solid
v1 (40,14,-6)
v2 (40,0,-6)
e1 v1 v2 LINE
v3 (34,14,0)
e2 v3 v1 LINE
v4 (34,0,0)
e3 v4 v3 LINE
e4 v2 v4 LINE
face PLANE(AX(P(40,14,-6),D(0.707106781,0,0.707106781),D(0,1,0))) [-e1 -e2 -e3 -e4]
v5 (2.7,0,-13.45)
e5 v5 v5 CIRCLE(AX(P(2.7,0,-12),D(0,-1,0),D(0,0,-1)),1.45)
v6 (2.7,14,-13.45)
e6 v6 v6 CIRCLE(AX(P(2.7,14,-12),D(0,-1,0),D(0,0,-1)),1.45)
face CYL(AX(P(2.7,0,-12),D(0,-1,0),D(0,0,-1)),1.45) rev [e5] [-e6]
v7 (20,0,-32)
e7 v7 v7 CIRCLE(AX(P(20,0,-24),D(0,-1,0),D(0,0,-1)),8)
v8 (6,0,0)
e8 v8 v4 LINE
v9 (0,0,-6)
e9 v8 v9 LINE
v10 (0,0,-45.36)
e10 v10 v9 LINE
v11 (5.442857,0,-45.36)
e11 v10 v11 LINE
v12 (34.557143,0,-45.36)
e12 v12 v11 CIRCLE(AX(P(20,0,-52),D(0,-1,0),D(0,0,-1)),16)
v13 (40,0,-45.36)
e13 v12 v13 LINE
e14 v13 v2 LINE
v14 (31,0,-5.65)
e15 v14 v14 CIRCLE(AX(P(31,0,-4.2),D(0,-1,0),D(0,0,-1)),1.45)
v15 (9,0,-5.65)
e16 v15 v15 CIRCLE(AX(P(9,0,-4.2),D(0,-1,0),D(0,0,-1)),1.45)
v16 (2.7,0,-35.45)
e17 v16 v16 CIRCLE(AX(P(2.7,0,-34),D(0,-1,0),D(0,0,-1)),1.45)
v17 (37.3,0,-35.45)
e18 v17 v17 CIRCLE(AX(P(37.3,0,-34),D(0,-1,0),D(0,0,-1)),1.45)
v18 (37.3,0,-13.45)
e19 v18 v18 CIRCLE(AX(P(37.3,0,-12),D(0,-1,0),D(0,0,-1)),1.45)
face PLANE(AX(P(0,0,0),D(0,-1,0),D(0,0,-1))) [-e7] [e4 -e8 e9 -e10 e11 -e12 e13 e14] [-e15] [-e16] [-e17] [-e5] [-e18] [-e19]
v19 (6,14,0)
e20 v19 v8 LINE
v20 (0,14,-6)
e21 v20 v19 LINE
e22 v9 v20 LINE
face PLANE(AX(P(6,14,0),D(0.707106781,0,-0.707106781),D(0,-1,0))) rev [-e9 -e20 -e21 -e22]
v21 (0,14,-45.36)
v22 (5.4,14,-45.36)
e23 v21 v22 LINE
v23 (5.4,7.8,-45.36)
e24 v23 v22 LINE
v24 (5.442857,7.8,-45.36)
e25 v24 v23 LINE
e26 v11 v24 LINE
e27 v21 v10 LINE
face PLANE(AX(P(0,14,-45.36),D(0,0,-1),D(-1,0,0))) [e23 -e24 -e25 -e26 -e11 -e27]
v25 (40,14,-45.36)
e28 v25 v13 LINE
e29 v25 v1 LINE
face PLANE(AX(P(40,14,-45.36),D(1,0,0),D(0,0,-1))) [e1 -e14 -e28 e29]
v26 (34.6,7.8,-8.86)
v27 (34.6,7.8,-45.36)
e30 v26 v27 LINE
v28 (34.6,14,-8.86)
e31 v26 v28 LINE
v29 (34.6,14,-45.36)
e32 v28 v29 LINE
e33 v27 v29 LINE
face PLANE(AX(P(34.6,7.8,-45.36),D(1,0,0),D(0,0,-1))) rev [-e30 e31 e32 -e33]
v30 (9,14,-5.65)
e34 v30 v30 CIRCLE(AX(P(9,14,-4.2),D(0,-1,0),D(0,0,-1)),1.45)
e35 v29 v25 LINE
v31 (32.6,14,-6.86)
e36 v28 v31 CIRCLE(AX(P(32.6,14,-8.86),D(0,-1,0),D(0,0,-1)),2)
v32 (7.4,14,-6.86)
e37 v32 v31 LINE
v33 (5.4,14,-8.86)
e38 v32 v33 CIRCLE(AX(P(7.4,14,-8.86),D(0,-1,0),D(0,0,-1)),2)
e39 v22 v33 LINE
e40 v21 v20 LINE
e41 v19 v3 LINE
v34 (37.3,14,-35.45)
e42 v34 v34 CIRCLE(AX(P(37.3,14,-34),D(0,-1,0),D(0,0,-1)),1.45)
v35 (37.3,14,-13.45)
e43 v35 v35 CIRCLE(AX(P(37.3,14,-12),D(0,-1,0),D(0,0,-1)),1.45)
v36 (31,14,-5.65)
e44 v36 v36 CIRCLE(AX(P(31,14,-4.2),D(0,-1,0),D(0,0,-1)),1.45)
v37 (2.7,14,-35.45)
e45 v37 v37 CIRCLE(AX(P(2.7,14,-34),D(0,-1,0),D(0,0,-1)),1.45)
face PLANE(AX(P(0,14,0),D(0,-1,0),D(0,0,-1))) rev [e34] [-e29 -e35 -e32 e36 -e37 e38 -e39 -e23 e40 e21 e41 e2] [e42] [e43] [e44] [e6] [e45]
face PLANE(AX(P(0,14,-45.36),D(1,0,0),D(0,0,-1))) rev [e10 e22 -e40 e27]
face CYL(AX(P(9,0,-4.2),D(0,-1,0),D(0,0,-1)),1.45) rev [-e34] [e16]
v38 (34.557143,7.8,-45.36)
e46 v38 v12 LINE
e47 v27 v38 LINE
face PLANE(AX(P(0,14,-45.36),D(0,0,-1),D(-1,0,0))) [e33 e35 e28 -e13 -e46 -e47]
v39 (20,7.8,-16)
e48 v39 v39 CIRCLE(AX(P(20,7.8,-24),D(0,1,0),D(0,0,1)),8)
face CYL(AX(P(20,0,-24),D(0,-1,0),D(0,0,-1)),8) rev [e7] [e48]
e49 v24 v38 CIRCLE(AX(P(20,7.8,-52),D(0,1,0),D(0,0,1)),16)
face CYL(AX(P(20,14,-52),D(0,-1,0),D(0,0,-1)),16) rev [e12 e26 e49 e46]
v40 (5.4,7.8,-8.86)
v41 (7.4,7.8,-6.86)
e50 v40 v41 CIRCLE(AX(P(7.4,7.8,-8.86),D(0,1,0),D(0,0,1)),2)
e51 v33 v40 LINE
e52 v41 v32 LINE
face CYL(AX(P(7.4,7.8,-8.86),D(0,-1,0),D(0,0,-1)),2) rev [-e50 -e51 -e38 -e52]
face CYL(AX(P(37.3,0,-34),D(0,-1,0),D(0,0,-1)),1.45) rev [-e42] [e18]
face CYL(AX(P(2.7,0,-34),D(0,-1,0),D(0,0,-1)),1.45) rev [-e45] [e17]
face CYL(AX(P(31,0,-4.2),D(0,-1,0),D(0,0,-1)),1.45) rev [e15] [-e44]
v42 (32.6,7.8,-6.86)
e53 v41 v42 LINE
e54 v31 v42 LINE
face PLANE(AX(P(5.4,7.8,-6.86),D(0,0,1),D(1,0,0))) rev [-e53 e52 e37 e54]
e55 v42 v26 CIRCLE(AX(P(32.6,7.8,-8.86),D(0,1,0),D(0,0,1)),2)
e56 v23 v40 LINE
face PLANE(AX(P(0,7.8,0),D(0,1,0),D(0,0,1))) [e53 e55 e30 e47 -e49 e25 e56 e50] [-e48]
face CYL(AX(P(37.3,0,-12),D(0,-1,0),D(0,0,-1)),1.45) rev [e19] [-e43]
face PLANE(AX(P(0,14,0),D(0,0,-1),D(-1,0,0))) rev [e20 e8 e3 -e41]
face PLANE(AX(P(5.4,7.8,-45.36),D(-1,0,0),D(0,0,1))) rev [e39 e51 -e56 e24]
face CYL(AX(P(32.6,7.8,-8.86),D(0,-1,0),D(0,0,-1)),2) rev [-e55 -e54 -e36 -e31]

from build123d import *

# Parameters (mm, degrees)
SKETCH1_W                      = 40
SKETCH1_H                      = 45.36
BOSS_EXTRUDE1_DEPTH            = 14
SKETCH2_W                      = 29.2
SKETCH2_H                      = 38.5
CUT_EXTRUDE1_DEPTH             = 6.2
M2_5_CLEARANCE_HOLE1_OUTLINE_R = 1.45
M2_5_CLEARANCE_HOLE1_DEPTH     = 14
F_16_0MM_DOWEL_HOLE1_D         = 16
SKETCH11_R                     = 16
CUT_EXTRUDE2_DEPTH             = 63.076804041
CHAMFER1_SIZE                  = 6
FILLET1_R                      = 2


# Read off the part's stored shape, not the designer's step: M2.5 Clearance Hole1
with BuildPart() as part:
    # Sketch1 → Boss-Extrude1 (new body)
    with BuildSketch(Plane(origin=(0, 0, 0), x_dir=(1, 0, 0), z_dir=(0, 1, 0))):
        with Locations((20, 22.68)):
            Rectangle(SKETCH1_W, SKETCH1_H)
    extrude(amount=BOSS_EXTRUDE1_DEPTH)

    # Sketch2 → Cut-Extrude1 (cut)
    with BuildSketch(Plane(origin=(0, 14, 0), x_dir=(1, 0, 0), z_dir=(0, 1, 0))):
        with Locations((20, 26.11)):
            Rectangle(SKETCH2_W, SKETCH2_H)
    extrude(amount=-CUT_EXTRUDE1_DEPTH, mode=Mode.SUBTRACT)

    # M2.5 Clearance Hole1 outline → M2.5 Clearance Hole1 (cut)
    with BuildSketch(Plane(origin=(0, 0, 0), x_dir=(1, 0, 0), z_dir=(0, 1, 0))):
        with Locations((9, 4.2)):
            Circle(M2_5_CLEARANCE_HOLE1_OUTLINE_R)
        with Locations((31, 4.2)):
            Circle(M2_5_CLEARANCE_HOLE1_OUTLINE_R)
        with Locations((2.7, 34)):
            Circle(M2_5_CLEARANCE_HOLE1_OUTLINE_R)
        with Locations((2.7, 12)):
            Circle(M2_5_CLEARANCE_HOLE1_OUTLINE_R)
        with Locations((37.3, 12)):
            Circle(M2_5_CLEARANCE_HOLE1_OUTLINE_R)
        with Locations((37.3, 34)):
            Circle(M2_5_CLEARANCE_HOLE1_OUTLINE_R)
    extrude(amount=M2_5_CLEARANCE_HOLE1_DEPTH, mode=Mode.SUBTRACT)

    # Ø16.0mm Dowel Hole1 (through all)
    with Locations(Plane(origin=(0, 0, 0), x_dir=(-1, 0, 0), z_dir=(0, -1, 0))):
        with Locations((-20, 24)):
            Hole(F_16_0MM_DOWEL_HOLE1_D / 2)

    # Sketch11 → Cut-Extrude2 (cut, through all)
    with BuildSketch(Plane.XZ):
        with Locations((20, -52)):
            Circle(SKETCH11_R)
    extrude(amount=-CUT_EXTRUDE2_DEPTH, mode=Mode.SUBTRACT)

    # Chamfer1
    chamfer1_edges = [part.edges().sort_by_distance(p)[0] for p in [
        (0, 7, 0),
        (40, 7, 0),
    ]]
    chamfer(chamfer1_edges, length=CHAMFER1_SIZE)

    # Fillet1
    fillet1_edges = [part.edges().sort_by_distance(p)[0] for p in [
        (5.4, 10.9, -6.86),
        (34.6, 10.9, -6.86),
    ]]
    fillet(fillet1_edges, radius=FILLET1_R)


solid = part.part
